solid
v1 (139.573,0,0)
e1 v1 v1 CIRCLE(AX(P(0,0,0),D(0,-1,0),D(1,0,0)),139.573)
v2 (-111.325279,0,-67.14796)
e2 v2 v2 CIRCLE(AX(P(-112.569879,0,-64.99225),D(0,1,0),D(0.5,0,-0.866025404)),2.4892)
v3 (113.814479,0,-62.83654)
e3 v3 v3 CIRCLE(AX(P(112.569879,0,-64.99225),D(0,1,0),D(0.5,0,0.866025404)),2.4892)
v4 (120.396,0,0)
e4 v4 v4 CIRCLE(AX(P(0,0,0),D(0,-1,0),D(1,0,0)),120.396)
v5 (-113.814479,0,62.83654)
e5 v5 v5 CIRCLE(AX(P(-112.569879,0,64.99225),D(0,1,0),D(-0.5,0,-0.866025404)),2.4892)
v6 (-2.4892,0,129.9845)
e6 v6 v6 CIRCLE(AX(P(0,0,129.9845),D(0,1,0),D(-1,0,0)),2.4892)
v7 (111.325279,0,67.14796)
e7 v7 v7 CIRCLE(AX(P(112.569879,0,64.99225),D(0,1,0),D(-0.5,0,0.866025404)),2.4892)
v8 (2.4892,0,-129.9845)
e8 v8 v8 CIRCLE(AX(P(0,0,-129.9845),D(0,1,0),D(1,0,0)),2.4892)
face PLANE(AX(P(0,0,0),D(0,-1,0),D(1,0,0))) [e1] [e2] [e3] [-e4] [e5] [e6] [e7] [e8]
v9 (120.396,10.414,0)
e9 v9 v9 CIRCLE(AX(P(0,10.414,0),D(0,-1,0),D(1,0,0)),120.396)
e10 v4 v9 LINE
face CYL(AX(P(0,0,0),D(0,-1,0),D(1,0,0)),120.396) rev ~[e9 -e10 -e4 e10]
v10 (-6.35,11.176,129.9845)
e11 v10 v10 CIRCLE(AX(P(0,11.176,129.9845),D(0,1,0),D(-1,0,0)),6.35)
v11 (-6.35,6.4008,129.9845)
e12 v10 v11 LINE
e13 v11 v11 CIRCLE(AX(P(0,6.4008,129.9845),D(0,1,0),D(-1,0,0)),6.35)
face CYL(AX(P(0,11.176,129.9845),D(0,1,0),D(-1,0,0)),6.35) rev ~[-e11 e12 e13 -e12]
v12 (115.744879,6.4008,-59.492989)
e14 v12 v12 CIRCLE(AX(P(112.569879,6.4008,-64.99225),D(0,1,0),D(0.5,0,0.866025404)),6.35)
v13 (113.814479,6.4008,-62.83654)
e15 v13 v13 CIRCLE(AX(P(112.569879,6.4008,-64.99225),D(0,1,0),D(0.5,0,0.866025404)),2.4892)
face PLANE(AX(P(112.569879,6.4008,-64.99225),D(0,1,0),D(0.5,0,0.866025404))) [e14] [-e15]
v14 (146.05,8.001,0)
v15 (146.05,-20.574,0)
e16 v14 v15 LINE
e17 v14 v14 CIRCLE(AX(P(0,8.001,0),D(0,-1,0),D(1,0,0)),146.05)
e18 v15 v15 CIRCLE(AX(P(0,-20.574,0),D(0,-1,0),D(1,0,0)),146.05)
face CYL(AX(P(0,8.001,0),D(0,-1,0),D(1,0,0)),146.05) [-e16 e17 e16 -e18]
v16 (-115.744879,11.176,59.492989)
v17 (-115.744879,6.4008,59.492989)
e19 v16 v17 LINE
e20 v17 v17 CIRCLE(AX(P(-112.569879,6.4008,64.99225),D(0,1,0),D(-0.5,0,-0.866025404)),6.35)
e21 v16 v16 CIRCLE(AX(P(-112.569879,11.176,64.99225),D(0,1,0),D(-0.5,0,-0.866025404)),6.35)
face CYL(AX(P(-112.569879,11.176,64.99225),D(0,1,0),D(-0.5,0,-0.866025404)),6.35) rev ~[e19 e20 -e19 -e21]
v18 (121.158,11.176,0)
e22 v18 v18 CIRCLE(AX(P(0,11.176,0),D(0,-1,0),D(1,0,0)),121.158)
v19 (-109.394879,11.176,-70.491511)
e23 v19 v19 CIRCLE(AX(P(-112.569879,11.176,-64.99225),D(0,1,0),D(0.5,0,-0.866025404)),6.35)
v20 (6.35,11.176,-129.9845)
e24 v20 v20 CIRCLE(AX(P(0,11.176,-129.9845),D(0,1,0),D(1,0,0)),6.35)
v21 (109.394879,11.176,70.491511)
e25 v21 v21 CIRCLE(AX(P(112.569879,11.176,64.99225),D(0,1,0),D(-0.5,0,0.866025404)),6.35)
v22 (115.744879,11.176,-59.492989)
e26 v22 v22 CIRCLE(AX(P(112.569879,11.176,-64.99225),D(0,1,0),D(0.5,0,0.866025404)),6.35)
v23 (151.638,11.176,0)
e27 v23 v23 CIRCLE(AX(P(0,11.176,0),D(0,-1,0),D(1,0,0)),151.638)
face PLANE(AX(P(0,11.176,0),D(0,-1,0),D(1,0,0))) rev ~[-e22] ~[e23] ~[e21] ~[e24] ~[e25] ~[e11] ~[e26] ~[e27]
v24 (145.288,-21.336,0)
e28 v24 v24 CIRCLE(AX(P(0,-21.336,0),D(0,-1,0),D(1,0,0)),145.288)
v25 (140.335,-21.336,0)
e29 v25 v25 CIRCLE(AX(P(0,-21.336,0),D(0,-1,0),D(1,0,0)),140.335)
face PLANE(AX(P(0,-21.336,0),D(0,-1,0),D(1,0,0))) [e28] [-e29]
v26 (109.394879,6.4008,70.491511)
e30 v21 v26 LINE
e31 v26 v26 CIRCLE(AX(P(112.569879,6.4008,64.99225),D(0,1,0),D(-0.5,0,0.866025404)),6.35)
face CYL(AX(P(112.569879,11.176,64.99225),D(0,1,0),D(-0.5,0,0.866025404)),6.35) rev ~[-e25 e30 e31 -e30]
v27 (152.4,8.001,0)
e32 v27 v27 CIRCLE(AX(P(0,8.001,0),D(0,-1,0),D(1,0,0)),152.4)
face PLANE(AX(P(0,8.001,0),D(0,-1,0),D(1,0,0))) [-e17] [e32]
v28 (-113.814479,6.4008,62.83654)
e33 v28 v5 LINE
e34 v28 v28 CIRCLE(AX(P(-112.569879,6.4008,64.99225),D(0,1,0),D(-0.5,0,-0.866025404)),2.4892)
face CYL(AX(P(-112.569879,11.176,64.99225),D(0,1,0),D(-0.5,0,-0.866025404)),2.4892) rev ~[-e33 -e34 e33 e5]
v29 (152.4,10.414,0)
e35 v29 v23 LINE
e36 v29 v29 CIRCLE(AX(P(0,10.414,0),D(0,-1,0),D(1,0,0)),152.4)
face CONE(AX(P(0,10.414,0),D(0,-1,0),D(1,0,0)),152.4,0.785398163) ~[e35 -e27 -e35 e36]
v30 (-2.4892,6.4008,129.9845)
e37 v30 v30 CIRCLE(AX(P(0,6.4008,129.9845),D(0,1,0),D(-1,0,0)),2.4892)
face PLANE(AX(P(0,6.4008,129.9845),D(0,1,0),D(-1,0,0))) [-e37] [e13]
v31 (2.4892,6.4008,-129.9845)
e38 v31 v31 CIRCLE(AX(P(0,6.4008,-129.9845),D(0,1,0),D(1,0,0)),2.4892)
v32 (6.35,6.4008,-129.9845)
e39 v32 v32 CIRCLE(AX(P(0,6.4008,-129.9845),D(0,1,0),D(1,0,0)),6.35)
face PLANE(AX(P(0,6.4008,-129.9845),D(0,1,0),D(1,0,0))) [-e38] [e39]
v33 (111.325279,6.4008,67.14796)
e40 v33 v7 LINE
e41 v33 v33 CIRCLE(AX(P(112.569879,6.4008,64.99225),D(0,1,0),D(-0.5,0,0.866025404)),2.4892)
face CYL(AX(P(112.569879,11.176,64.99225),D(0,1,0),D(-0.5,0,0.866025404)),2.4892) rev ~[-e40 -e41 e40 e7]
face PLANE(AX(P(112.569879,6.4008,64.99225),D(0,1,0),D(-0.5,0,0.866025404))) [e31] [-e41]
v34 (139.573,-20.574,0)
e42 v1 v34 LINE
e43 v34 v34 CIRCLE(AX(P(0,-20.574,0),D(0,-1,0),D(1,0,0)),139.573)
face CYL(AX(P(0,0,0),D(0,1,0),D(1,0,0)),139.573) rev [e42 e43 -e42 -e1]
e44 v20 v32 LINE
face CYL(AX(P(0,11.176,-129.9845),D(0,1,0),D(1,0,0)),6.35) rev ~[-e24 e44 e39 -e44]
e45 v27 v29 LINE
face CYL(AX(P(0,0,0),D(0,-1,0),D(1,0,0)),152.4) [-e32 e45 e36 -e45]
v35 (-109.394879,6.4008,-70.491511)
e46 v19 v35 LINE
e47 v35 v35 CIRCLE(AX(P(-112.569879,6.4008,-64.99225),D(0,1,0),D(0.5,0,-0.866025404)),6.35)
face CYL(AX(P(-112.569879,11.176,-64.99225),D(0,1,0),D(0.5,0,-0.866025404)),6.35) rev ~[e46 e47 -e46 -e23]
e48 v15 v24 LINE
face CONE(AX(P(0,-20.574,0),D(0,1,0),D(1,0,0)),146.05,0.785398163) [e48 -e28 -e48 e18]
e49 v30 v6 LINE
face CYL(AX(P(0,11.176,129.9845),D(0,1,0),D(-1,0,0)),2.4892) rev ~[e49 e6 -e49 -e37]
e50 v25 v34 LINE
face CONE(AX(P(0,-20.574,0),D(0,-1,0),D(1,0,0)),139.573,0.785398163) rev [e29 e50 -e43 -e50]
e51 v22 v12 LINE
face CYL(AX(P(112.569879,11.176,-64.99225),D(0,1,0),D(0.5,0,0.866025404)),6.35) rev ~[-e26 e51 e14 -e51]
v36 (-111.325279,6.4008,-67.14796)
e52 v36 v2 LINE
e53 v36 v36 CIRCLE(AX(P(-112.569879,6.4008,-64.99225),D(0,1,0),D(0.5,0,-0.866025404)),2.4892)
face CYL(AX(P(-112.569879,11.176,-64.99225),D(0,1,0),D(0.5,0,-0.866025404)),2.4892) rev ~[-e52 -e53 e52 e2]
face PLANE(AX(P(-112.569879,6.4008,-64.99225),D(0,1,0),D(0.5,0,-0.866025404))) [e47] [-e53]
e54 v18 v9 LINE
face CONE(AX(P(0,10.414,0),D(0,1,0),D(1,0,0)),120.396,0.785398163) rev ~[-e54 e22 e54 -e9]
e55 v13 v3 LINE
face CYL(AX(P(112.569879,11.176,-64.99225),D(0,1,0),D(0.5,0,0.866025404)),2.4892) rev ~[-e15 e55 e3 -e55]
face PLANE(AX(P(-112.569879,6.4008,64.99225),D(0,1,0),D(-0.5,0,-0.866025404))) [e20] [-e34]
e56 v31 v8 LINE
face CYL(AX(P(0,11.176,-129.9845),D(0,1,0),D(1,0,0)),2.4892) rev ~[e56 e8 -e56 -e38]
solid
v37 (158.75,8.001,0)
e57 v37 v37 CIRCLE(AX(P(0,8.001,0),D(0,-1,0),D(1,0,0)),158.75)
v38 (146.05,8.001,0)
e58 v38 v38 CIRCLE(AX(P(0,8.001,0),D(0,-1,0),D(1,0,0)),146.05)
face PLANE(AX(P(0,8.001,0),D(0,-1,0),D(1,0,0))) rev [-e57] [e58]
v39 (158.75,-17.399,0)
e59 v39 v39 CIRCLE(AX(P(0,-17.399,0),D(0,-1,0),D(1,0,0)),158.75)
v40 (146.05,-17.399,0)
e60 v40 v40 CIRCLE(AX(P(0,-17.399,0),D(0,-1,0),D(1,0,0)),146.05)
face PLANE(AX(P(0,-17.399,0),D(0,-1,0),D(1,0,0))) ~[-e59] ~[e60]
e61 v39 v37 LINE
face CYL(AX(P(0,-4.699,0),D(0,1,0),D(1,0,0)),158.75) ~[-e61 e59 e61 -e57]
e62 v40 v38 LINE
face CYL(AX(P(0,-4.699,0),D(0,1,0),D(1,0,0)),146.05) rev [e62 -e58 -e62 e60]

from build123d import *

# Parameters (mm, degrees)
F0_R             = 152.4
F0_R_2           = 120.396
F1_DEPTH         = 11.176
F2_R             = 152.4
F2_R_2           = 139.573
F3_DEPTH         = 21.336
F6_SIZE          = 0.762
F7_W             = 12.7
F7_H             = 25.4
F9_R             = 6.35
F10_DEPTH        = 4.7752
F10_COPIES_COUNT = 6
F11_R            = 2.4892
F12_DEPTH        = 25.4
F12_COPIES_COUNT = 6


# Not quite as in the source:
# - a pattern or mirror of a feature is missing from the dataset's text; its kind, count and spacing are read off the source's solid


with BuildPart() as f1:
    # F0 (on Front) → F1 (new body)
    with BuildSketch(Plane.XZ):
        Circle(F0_R)
        Circle(F0_R_2, mode=Mode.SUBTRACT)
    extrude(amount=-F1_DEPTH)

    # F2 (on face) → F3 (join)
    with BuildSketch(Plane.XZ):
        Circle(F2_R)
        Circle(F2_R_2, mode=Mode.SUBTRACT)
    extrude(amount=F3_DEPTH)

    # F4 (on Top) → F5 (revolve, cut)
    with BuildSketch(Plane.XY):
        Polygon((176.0028898716, -18.161), (176.0028898716, 8.001), (146.05, 8.001), (146.05, -18.161), (146.05, -21.336), (152.4, -21.336), (176.0028898716, -21.336), align=None)
    revolve(axis=Axis((0, -10.1678725332, 0), (0, -1, 0)), mode=Mode.SUBTRACT)

    # F6
    f6_edges = [f1.edges().sort_by_distance(p)[0] for p in [
        (-120.396, 11.176, 0),
        (-152.4, 11.176, 0),
        (-139.573, -21.336, 0),
        (-146.05, -21.336, 0),
        (146.05, -6.6675, 0),
    ]]
    chamfer(f6_edges, length=F6_SIZE)

    # F9 (on face) → F10 (cut)
    with BuildSketch(Plane(origin=(0, 11.176, 0), x_dir=(-1, 0, 0), z_dir=(0, 1, 0))):
        with Locations((0, 129.9845)):
            Circle(F9_R)
    f10 = extrude(amount=-F10_DEPTH, mode=Mode.SUBTRACT)

    # F10_copies: F10 ×6 about axis
    f10_copies_axis = Axis((0, 0, 0), (0, 1, 0))
    for i in range(1, F10_COPIES_COUNT):
        add(f10.rotate(f10_copies_axis, i * 360 / F10_COPIES_COUNT), mode=Mode.SUBTRACT)

    # F11 (on face) → F12 (cut)
    with BuildSketch(Plane(origin=(0, 11.176, 0), x_dir=(-1, 0, 0), z_dir=(0, 1, 0))):
        with Locations((0, 129.9845)):
            Circle(F11_R)
    f12 = extrude(amount=-F12_DEPTH, mode=Mode.SUBTRACT)

    # F12_copies: F12 ×6 about axis
    f12_copies_axis = Axis((0, 0, 0), (0, 1, 0))
    for i in range(1, F12_COPIES_COUNT):
        add(f12.rotate(f12_copies_axis, i * 360 / F12_COPIES_COUNT), mode=Mode.SUBTRACT)


with BuildPart() as f8:
    # F7 (on Top) → F8 (revolve)
    with BuildSketch(Plane.XY):
        with Locations((152.4, -4.699)):
            Rectangle(F7_W, F7_H)
    revolve(axis=Axis((0, -13.9294480905, 0), (0, -1, 0)))


solid = Compound([f1.part, f8.part])
